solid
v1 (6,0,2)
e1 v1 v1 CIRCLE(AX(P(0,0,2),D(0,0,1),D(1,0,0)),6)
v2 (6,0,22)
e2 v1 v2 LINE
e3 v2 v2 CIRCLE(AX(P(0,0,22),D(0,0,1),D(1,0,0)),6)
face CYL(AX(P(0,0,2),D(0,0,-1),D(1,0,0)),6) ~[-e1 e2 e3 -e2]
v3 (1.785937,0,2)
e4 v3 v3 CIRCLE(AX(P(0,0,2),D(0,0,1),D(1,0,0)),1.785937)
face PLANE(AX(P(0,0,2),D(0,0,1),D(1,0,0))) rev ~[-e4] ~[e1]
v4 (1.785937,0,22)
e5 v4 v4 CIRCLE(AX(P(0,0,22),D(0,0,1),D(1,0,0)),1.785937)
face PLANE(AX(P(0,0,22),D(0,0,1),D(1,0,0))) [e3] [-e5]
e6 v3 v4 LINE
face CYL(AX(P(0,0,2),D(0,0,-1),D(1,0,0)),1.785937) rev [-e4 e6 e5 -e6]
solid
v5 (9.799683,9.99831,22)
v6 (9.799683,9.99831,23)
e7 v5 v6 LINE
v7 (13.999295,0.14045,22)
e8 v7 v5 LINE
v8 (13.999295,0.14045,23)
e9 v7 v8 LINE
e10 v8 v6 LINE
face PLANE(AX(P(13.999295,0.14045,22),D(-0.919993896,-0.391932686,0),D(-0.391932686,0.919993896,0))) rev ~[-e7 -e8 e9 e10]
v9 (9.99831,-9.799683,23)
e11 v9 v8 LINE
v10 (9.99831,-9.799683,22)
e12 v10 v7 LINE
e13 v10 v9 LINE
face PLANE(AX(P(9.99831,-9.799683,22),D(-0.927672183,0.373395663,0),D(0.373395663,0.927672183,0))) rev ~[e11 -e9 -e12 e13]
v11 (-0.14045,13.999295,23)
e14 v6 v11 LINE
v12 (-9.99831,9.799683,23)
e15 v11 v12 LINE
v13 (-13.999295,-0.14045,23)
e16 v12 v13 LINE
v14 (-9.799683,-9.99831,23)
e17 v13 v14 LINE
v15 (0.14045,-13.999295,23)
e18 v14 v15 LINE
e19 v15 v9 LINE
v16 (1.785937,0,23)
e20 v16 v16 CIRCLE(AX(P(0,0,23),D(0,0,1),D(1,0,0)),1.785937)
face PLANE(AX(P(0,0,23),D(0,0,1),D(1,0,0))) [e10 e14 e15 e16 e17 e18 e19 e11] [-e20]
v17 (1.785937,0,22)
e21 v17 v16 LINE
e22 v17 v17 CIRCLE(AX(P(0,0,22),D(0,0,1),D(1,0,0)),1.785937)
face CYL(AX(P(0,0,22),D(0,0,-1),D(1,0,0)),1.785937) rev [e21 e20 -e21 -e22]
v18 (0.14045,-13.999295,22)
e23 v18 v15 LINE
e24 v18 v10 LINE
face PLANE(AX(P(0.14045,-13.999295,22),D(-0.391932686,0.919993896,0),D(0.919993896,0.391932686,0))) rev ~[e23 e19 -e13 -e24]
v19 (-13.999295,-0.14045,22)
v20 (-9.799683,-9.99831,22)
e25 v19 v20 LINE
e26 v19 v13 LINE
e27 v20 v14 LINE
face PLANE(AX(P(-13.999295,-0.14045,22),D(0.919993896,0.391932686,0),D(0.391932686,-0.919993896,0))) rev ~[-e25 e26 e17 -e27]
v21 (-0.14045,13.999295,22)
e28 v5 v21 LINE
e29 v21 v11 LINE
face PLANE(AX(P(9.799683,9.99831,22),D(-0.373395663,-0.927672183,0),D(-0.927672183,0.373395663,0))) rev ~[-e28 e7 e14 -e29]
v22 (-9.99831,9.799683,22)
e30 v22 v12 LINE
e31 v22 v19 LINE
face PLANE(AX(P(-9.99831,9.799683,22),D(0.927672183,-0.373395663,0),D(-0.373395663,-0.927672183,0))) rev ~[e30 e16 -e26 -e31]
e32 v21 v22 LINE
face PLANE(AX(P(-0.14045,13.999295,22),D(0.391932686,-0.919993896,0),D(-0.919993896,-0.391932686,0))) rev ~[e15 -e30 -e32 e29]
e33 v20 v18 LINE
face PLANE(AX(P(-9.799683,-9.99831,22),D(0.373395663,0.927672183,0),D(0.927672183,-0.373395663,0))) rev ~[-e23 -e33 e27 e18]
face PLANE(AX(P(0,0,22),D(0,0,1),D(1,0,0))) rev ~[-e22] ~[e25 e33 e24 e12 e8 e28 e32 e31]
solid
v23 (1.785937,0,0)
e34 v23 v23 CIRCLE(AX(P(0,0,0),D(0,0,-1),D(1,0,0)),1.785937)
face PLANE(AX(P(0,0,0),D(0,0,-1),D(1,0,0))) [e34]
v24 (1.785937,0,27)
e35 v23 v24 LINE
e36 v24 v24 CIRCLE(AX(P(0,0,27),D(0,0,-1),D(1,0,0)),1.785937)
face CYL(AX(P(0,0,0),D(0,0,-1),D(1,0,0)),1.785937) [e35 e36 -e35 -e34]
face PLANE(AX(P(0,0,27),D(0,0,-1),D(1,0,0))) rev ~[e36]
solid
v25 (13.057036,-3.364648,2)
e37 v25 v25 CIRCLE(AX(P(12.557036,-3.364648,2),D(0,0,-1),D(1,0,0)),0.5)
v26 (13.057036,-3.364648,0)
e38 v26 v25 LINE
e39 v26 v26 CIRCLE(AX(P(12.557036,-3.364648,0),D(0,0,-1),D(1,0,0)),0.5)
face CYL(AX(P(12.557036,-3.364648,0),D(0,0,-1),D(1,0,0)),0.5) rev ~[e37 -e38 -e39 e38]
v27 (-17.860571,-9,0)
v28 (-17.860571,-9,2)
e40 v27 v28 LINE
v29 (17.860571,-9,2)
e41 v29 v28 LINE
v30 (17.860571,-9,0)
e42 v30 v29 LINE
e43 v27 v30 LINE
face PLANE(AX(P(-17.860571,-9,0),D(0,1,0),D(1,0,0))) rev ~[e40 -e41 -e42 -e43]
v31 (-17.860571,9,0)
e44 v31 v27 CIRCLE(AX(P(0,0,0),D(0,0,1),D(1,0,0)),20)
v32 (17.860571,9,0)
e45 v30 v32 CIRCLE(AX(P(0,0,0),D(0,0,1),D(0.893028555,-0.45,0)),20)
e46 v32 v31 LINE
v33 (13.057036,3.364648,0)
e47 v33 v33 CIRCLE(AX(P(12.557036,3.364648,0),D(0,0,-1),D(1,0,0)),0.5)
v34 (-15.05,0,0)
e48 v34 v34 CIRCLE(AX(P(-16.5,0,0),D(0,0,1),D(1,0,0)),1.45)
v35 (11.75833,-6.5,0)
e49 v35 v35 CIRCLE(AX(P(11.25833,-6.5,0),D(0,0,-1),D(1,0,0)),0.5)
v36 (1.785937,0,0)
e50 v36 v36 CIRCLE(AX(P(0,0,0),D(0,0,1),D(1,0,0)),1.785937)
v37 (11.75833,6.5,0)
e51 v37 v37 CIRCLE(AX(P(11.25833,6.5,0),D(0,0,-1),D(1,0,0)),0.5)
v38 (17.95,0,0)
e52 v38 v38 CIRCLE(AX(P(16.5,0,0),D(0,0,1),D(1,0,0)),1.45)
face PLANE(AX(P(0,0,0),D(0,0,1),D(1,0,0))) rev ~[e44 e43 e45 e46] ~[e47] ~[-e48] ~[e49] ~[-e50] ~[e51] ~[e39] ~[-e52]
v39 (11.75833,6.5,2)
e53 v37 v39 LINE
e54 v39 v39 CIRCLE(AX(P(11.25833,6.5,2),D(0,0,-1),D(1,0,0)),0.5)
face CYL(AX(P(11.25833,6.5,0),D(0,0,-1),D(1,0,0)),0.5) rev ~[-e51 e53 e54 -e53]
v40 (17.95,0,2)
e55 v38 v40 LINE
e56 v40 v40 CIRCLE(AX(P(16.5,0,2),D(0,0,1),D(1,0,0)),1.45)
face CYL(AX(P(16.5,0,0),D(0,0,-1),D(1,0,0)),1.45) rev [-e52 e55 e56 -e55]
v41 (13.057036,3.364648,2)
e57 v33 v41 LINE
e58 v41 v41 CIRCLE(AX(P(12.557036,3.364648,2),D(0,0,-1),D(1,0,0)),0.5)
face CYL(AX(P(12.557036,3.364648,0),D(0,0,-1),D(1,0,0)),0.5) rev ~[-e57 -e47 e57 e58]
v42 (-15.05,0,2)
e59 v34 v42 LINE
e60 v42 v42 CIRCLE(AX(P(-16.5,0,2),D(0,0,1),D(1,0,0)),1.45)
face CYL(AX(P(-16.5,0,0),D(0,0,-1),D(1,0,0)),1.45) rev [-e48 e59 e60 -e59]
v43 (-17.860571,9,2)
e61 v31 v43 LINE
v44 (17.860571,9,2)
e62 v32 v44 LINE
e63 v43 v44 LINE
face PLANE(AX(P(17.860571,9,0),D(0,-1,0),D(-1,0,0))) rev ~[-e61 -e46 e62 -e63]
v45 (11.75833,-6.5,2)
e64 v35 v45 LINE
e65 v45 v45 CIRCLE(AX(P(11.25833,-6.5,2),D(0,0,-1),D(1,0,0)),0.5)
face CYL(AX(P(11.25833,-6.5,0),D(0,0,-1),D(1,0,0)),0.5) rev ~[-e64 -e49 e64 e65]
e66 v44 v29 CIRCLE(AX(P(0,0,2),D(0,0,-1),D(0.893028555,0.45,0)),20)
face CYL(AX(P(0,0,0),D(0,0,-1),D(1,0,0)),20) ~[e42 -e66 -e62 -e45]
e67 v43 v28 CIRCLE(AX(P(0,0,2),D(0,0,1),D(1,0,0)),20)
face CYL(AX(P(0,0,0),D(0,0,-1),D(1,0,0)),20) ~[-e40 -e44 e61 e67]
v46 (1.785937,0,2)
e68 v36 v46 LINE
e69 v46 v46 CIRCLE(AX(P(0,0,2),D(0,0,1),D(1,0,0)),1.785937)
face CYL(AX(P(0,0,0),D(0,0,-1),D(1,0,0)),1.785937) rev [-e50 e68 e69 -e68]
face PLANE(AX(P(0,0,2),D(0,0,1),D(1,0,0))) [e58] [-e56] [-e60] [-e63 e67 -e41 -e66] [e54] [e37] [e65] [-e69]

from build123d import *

# Parameters (mm, degrees)
F0_R      = 20
F0_R_2    = 1.45
F0_R_3    = 1.7859375
F1_DEPTH  = 2
F2_R      = 6
F2_R_2    = 1.7859375
F3_DEPTH  = 20
F4_R      = 1.7859375
F5_DEPTH  = 27
F6_R      = 1.7859375
F7_DEPTH  = 1
F9_DEPTH  = 25
F10_R     = 0.5
F11_DEPTH = 25


with BuildPart() as f1:
    # F0 (on Top) → F1 (new body)
    with BuildSketch(Plane.XY):
        Circle(F0_R)
        with Locations((-16.5, 0)):
            Circle(F0_R_2, mode=Mode.SUBTRACT)
        Circle(F0_R_3, mode=Mode.SUBTRACT)
        with Locations((16.5, 0)):
            Circle(F0_R_2, mode=Mode.SUBTRACT)
    extrude(amount=F1_DEPTH)

    # F8 (on face) → F9 (cut)
    with BuildSketch(Plane(origin=(0, 0, 0), x_dir=(1, 0, 0), z_dir=(0, 0, -1))):
        with BuildLine():
            ThreePointArc((17.8605710995, 9), (0, 20), (-17.8605710995, 9))
            Line((-17.8605710995, 9), (17.8605710995, 9))
        make_face()
        with BuildLine():
            Line((17.8605710995, -9), (-17.8605710995, -9))
            ThreePointArc((-17.8605710995, -9), (0, -20), (17.8605710995, -9))
        make_face()
    extrude(amount=-F9_DEPTH, mode=Mode.SUBTRACT)

    # F10 (on face) → F11 (cut)
    with BuildSketch(Plane(origin=(0, 0, 0), x_dir=(1, 0, 0), z_dir=(0, 0, -1))):
        with Locations((11.2583302492, 6.5)):
            Circle(F10_R)
        with Locations((12.5570357418, 3.3646475863)):
            Circle(F10_R)
        with Locations((12.5570357418, -3.3646475863)):
            Circle(F10_R)
        with Locations((11.2583302492, -6.5)):
            Circle(F10_R)
    extrude(amount=-F11_DEPTH, mode=Mode.SUBTRACT)


with BuildPart() as f3:
    # F2 (on face) → F3 (new body)
    with BuildSketch(Plane.XY.offset(2)):
        Circle(F2_R)
        Circle(F2_R_2, mode=Mode.SUBTRACT)
    extrude(amount=F3_DEPTH)


with BuildPart() as f5:
    # F4 (on face) → F5 (new body)
    with BuildSketch(Plane(origin=(0, 0, 0), x_dir=(1, 0, 0), z_dir=(0, 0, -1))):
        Circle(F4_R)
    extrude(amount=-F5_DEPTH)


with BuildPart() as f7:
    # F6 (on face) → F7 (new body)
    with BuildSketch(Plane.XY.offset(22)):
        Polygon((-0.1404503089, 13.9992954719), (-9.9983101259, 9.7996833942), (-13.9992954719, -0.1404503089), (-9.7996833942, -9.9983101259), (0.1404503089, -13.9992954719), (9.9983101259, -9.7996833942), (13.9992954719, 0.1404503089), (9.7996833942, 9.9983101259), align=None)
        Circle(F6_R, mode=Mode.SUBTRACT)
    extrude(amount=F7_DEPTH)


solid = Compound([f1.part, f3.part, f5.part, f7.part])
